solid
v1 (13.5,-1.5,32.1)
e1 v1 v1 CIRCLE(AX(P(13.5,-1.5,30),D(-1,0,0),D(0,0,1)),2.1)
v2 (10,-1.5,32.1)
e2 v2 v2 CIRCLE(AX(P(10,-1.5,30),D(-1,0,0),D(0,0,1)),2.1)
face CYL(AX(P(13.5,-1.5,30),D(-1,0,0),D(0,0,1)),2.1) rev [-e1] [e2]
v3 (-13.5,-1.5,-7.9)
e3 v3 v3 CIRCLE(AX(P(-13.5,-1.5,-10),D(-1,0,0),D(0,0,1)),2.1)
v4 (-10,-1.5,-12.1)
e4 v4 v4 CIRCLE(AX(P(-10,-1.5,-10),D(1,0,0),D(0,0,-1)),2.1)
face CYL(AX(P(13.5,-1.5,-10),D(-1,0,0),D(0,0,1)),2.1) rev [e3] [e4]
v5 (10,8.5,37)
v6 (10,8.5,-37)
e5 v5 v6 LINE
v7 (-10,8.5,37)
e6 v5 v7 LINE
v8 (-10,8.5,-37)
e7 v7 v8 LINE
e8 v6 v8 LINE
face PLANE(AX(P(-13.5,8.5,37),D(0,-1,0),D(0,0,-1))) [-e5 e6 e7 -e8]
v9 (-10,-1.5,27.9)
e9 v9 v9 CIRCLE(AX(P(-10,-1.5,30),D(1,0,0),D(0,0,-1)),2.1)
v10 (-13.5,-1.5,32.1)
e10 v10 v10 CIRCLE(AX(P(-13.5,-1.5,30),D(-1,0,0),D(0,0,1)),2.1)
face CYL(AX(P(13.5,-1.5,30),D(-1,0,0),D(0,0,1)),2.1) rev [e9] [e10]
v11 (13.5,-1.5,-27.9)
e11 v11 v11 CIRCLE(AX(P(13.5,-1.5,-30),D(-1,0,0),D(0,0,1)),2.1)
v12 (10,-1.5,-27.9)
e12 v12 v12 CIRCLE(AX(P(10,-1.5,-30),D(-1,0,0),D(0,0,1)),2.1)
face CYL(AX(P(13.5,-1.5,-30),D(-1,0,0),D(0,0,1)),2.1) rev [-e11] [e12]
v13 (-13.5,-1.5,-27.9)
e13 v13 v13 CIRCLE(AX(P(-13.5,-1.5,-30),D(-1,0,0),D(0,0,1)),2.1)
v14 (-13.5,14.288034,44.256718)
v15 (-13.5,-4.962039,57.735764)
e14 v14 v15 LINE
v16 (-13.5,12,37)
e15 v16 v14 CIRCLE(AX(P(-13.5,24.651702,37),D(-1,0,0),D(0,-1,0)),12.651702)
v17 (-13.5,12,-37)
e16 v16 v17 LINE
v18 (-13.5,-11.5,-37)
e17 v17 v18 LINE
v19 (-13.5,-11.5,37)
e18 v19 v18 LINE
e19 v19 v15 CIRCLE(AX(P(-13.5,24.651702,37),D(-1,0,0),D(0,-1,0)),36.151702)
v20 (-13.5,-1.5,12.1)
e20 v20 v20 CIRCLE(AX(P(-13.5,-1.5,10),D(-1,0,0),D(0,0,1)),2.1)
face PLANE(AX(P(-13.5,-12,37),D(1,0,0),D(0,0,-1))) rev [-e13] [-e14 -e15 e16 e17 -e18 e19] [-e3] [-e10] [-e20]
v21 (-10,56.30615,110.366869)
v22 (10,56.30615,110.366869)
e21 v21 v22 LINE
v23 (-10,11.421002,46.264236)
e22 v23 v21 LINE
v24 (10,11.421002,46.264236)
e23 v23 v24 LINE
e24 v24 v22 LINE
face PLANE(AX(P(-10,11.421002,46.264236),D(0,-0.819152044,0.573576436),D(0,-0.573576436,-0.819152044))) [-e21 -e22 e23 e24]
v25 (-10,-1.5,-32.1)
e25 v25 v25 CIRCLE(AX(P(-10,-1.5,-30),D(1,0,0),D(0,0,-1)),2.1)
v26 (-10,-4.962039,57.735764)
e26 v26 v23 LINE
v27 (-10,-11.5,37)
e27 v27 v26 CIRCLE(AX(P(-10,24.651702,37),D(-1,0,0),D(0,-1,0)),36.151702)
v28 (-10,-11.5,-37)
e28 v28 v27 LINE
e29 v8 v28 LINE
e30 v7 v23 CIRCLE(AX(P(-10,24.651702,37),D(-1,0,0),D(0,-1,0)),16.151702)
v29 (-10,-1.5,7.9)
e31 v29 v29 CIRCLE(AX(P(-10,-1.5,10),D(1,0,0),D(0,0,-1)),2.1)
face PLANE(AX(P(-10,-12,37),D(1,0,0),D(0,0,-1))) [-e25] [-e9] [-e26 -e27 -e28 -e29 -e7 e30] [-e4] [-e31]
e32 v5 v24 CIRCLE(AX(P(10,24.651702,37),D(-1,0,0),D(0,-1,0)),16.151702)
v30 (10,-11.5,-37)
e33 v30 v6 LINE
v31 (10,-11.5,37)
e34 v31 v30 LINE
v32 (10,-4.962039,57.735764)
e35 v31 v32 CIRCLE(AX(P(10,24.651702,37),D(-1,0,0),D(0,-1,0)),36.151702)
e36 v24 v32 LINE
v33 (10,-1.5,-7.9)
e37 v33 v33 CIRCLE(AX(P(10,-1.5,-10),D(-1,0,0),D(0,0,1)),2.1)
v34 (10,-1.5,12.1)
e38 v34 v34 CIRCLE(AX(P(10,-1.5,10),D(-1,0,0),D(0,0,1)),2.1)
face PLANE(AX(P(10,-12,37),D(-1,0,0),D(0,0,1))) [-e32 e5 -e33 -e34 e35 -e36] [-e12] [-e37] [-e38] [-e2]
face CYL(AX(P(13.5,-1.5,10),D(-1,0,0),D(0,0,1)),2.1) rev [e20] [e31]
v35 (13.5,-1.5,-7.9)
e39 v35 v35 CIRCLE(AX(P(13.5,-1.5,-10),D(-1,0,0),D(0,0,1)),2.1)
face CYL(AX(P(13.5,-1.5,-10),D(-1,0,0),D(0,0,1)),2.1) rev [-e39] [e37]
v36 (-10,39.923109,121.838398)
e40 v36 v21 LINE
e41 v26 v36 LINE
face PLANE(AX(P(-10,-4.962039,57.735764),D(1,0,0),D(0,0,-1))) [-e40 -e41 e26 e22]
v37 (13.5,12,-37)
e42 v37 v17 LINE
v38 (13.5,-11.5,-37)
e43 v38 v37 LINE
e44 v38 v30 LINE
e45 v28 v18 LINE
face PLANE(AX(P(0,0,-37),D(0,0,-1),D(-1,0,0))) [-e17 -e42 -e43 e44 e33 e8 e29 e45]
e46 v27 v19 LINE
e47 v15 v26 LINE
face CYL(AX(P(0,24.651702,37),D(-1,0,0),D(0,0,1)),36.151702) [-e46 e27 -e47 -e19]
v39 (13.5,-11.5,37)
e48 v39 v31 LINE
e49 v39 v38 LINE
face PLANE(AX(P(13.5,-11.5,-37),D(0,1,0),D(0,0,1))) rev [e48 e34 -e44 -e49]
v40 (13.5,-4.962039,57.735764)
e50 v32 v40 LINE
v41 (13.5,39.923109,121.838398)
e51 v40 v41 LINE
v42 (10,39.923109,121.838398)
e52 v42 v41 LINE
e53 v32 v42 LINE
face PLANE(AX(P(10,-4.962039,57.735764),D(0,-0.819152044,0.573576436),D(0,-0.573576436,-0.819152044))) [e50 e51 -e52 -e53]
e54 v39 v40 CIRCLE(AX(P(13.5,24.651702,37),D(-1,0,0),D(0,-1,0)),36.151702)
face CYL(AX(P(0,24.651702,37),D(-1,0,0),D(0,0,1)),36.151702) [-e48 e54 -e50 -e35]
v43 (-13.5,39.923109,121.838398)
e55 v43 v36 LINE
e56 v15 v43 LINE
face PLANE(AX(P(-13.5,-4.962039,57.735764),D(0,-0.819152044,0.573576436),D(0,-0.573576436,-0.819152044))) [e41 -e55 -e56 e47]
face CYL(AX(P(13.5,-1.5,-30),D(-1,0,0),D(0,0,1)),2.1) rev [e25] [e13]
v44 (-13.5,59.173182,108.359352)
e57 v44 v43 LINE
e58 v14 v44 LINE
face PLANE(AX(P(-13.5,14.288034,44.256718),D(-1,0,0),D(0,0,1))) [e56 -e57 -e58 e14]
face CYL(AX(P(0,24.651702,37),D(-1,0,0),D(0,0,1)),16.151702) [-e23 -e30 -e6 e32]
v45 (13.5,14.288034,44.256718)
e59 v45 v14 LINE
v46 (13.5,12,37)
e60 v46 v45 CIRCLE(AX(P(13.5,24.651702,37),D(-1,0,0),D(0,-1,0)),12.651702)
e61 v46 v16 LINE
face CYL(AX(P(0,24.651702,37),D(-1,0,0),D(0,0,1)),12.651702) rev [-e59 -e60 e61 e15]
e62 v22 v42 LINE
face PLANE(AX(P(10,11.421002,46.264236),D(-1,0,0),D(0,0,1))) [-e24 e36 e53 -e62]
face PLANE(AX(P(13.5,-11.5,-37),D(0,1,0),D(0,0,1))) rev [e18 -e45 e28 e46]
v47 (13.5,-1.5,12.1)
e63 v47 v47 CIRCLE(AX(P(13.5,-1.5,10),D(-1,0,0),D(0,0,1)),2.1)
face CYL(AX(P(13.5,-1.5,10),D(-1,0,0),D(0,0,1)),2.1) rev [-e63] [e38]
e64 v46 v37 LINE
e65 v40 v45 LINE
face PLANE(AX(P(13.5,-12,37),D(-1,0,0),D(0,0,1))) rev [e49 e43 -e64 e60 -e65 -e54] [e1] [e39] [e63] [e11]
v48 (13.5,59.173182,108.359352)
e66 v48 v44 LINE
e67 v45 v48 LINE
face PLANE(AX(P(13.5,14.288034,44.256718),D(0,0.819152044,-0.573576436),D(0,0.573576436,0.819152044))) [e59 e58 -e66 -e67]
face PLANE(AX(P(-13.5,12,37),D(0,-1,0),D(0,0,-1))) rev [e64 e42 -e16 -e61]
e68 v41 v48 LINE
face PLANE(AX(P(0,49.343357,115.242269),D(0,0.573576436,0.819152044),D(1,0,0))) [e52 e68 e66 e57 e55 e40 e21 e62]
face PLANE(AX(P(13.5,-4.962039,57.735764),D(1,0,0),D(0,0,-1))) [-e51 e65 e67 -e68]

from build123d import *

# Parameters (mm, degrees)
SKETCH1_W           = 27
SKETCH1_H           = 24
BOSS_EXTRUDE1_DEPTH = 37
SHELL1_T            = -3.5
SKETCH3_R           = 2.1
CUT_EXTRUDE1_DEPTH  = 48.349762407
SKETCH5_W           = 74
SKETCH5_H           = 0.5
CUT_EXTRUDE3_DEPTH  = 48.349762407
SWEEP1_START        = -13.5
SWEEP1_DEPTH        = 27
SWEEP1_2_DEPTH      = 3.5
SWEEP1_START_2      = 10
SWEEP1_3_DEPTH      = 3.5


# Read off the part's stored shape, not the designer's step: Sweep1
with BuildPart() as part:
    # Sketch1 → Boss-Extrude1 (new, symmetric)
    with BuildSketch(Plane.XY):
        Rectangle(SKETCH1_W, SKETCH1_H)
    extrude(amount=BOSS_EXTRUDE1_DEPTH, both=True)

    # Shell1
    shell1_openings = [part.faces().sort_by_distance(p)[0] for p in [
        (0, 0, 37),
        (0, 0, -37),
        (0, -12, 0),
    ]]
    offset(amount=SHELL1_T, openings=shell1_openings, kind=Kind.INTERSECTION)

    # Sketch3 → Cut-Extrude1 (cut, through all)
    with BuildSketch(Plane.ZY.offset(13.5)):
        with Locations((-30, -1.5)):
            Circle(SKETCH3_R)
        with Locations((-10, -1.5)):
            Circle(SKETCH3_R)
        with Locations((10, -1.5)):
            Circle(SKETCH3_R)
        with Locations((30, -1.5)):
            Circle(SKETCH3_R)
    extrude(amount=-CUT_EXTRUDE1_DEPTH, mode=Mode.SUBTRACT)

    # Sketch5 → Cut-Extrude3 (cut, through all)
    with BuildSketch(Plane.ZY.offset(13.5)):
        with Locations((0, -11.75)):
            Rectangle(SKETCH5_W, SKETCH5_H)
    extrude(amount=-CUT_EXTRUDE3_DEPTH, mode=Mode.SUBTRACT)

    # Sweep1 outline → Sweep1 (add)
    with BuildSketch(Plane.YZ.offset(SWEEP1_START)):
        with BuildLine():
            Line((14.288034431, 44.256718109), (59.173181861, 108.359351944))
            Line((59.173181861, 108.359351944), (56.306149706, 110.366869471))
            Line((56.306149706, 110.366869471), (11.421002276, 46.264235636))
            ThreePointArc((11.421002276, 46.264235636), (9.247550016, 41.856910443), (8.5, 37))
            Line((8.5, 37), (12, 37))
            ThreePointArc((12, 37), (12.585559344, 40.804440145), (14.288034431, 44.256718109))
        make_face()
    extrude(amount=SWEEP1_DEPTH)

    # Sweep1 2 outline → Sweep1 2 (add)
    with BuildSketch(Plane.YZ.offset(SWEEP1_START)):
        with BuildLine():
            Line((11.421002276, 46.264235636), (56.306149706, 110.366869471))
            Line((56.306149706, 110.366869471), (39.923108821, 121.838398198))
            Line((39.923108821, 121.838398198), (-4.96203861, 57.735764364))
            ThreePointArc((-4.96203861, 57.735764364), (-9.826788999, 47.871026434), (-11.5, 37))
            Line((-11.5, 37), (8.5, 37))
            ThreePointArc((8.5, 37), (9.247550016, 41.856910443), (11.421002276, 46.264235636))
        make_face()
    extrude(amount=SWEEP1_2_DEPTH)

    # Sweep1 3 outline → Sweep1 3 (add)
    with BuildSketch(Plane.YZ.offset(SWEEP1_START_2)):
        with BuildLine():
            Line((11.421002276, 46.264235636), (56.306149706, 110.366869471))
            Line((56.306149706, 110.366869471), (39.923108821, 121.838398198))
            Line((39.923108821, 121.838398198), (-4.96203861, 57.735764364))
            ThreePointArc((-4.96203861, 57.735764364), (-9.826788999, 47.871026434), (-11.5, 37))
            Line((-11.5, 37), (8.5, 37))
            ThreePointArc((8.5, 37), (9.247550016, 41.856910443), (11.421002276, 46.264235636))
        make_face()
    extrude(amount=SWEEP1_3_DEPTH)


solid = part.part
